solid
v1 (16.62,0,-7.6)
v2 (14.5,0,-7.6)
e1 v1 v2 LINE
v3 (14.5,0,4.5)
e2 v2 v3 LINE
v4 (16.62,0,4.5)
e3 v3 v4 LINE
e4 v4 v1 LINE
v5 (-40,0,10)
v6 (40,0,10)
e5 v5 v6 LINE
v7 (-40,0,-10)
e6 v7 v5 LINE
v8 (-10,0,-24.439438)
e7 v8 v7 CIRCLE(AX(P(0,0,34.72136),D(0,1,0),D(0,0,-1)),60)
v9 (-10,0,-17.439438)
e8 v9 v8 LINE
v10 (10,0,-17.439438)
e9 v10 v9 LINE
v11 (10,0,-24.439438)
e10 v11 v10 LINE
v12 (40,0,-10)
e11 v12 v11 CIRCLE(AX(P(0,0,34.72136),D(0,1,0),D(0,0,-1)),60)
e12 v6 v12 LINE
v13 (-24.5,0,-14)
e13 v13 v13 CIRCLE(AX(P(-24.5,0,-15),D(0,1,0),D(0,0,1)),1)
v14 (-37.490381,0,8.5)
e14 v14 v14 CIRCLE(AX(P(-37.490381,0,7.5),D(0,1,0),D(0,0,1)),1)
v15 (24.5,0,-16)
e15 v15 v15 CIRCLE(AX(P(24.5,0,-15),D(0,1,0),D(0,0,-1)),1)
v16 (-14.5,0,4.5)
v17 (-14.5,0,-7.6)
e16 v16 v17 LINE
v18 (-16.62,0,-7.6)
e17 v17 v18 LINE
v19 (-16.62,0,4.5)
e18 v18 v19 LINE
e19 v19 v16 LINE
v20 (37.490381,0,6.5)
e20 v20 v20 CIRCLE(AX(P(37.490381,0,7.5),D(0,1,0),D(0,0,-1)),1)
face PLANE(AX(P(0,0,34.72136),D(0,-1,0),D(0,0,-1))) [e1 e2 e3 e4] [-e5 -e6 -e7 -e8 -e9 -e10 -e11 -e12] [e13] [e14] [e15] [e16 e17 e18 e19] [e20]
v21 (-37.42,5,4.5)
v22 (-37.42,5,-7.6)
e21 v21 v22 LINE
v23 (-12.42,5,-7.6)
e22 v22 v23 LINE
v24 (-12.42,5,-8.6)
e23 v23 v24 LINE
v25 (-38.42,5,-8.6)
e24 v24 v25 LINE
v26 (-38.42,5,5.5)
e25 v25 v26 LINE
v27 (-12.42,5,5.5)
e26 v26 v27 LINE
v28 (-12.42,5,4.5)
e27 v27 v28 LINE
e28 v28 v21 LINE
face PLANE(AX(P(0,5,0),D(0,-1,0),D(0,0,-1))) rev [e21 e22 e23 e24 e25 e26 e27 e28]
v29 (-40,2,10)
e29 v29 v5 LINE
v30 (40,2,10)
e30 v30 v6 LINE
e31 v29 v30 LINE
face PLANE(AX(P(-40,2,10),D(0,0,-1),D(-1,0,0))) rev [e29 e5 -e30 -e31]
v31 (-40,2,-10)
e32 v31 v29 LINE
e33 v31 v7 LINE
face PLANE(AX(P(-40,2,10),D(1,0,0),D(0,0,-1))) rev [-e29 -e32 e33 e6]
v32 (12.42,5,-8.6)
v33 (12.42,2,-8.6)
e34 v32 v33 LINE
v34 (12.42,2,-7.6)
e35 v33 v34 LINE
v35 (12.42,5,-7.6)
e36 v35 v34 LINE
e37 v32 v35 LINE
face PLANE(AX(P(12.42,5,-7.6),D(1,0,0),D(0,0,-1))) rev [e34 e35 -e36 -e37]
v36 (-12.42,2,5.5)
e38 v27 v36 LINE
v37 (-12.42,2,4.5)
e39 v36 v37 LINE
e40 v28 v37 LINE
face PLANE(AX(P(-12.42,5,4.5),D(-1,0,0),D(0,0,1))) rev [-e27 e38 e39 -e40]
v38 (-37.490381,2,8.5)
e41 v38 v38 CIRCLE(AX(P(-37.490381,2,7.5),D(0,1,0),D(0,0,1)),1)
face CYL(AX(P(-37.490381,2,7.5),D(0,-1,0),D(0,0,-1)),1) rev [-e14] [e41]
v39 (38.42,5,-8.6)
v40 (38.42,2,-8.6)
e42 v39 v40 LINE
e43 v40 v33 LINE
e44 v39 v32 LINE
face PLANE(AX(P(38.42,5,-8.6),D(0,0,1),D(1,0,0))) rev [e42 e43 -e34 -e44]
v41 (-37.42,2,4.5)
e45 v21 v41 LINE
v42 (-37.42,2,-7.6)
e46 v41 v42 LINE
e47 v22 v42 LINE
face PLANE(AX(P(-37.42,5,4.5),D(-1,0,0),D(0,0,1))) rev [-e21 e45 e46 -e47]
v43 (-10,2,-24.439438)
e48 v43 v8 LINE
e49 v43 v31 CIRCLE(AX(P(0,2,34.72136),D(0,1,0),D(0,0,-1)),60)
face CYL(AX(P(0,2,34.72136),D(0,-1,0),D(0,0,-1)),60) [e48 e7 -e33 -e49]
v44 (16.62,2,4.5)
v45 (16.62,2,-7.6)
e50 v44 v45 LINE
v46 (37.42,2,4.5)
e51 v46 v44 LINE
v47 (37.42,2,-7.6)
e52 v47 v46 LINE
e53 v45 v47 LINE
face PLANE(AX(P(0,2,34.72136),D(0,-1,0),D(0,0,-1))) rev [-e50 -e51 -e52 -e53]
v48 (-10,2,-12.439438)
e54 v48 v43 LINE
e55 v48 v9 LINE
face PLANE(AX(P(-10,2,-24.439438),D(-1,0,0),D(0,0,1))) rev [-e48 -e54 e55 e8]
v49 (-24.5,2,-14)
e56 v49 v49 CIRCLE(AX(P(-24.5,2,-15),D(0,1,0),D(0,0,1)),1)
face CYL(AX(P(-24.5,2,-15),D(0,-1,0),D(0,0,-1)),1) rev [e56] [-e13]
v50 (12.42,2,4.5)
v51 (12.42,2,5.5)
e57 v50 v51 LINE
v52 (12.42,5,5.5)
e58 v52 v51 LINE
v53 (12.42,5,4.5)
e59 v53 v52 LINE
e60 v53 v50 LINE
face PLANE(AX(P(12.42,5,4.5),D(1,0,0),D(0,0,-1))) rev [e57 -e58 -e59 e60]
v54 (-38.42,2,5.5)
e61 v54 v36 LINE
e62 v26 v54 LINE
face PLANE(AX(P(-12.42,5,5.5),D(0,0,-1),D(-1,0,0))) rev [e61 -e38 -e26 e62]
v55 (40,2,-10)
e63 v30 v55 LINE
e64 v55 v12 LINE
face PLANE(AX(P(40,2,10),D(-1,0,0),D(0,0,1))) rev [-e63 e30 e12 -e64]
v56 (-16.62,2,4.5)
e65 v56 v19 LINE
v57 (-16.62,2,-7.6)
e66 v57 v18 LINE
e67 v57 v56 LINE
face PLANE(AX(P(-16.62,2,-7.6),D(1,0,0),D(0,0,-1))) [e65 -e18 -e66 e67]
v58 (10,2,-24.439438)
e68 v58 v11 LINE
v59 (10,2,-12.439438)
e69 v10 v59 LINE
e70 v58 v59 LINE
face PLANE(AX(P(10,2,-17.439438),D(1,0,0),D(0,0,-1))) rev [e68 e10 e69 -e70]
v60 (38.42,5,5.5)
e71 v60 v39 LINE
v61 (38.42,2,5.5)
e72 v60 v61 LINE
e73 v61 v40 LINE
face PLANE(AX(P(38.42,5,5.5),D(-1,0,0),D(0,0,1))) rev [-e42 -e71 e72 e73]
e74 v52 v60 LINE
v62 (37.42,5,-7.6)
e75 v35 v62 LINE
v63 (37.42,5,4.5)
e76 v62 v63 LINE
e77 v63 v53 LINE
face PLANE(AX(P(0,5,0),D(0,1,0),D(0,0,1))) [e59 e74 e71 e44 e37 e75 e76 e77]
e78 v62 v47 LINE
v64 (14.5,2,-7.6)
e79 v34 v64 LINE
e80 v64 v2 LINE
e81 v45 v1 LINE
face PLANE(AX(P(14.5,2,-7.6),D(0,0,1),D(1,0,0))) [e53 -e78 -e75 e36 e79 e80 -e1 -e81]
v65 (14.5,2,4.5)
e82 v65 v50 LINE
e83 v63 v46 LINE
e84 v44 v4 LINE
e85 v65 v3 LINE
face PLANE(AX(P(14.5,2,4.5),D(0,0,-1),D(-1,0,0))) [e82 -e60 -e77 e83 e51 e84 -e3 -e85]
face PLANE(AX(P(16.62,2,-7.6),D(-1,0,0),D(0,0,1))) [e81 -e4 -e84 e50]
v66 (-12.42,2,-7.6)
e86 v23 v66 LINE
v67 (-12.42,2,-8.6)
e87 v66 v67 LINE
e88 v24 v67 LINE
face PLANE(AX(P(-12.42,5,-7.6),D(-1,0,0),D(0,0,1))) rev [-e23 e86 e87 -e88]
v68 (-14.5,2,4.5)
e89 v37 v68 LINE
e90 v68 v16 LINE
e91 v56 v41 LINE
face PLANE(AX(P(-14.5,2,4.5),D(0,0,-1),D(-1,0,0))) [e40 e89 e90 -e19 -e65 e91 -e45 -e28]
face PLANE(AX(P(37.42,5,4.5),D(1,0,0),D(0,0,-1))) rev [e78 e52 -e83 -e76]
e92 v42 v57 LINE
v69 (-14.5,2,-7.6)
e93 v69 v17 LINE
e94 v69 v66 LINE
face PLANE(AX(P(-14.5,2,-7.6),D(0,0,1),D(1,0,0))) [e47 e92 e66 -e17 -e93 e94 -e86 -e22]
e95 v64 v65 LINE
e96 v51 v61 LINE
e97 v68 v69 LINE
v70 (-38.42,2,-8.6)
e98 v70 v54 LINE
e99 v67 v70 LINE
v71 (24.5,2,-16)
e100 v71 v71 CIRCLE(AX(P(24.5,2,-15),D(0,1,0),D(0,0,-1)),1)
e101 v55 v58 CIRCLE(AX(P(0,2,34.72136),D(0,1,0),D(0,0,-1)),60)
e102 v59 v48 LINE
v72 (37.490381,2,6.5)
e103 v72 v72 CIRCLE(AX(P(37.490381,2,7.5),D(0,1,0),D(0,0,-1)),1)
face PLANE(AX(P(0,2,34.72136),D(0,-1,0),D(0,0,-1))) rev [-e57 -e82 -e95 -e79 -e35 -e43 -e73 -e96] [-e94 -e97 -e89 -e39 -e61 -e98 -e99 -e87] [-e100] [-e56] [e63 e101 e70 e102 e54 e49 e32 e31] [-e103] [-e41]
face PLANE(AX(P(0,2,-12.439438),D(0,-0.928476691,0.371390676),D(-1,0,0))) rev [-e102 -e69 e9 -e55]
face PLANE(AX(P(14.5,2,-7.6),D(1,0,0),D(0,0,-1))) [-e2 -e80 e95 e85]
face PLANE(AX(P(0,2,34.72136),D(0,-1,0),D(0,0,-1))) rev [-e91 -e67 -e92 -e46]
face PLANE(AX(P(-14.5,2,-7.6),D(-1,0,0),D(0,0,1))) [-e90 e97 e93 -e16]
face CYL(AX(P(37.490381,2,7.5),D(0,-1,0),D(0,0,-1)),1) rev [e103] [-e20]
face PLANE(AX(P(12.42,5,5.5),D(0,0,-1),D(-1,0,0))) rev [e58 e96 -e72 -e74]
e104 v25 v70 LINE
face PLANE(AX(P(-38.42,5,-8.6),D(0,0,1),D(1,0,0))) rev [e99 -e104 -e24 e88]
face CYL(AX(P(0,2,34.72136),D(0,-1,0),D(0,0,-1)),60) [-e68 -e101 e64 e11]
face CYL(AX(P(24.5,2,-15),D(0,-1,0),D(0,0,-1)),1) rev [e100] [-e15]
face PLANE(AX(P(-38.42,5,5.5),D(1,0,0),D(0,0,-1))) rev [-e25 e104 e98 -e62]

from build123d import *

# Parameters (mm, degrees)
SKETCH2_R           = 1
SKETCH2_W           = 2.12
SKETCH2_H           = 12.1
BOSS_EXTRUDE2_DEPTH = 2
BOSS_EXTRUDE3_DEPTH = 3
CHAMFER1_SIZE2      = 2
CHAMFER1_SIZE       = 5


with BuildPart() as part:
    # Sketch2 → Boss-Extrude2 (new body)
    with BuildSketch(Plane(origin=(0, 0, 0), x_dir=(1, 0, 0), z_dir=(0, 1, 0))):
        with BuildLine():
            Line((-10, 24.439438281), (-10, 17.439438281))
            Line((-10, 17.439438281), (10, 17.439438281))
            Line((10, 17.439438281), (10, 24.439438281))
            ThreePointArc((10, 24.439438281), (26.021613026, 19.342266443), (40, 10))
            Line((40, 10), (40, -10))
            Line((40, -10), (-40, -10))
            Line((-40, -10), (-40, 10))
            ThreePointArc((-40, 10), (-26.021613026, 19.342266443), (-10, 24.439438281))
        make_face()
        with Locations(Location((-37.490381057, -7.5, 0), (0, 0, 270))):
            Circle(SKETCH2_R, mode=Mode.SUBTRACT)
        with Locations(Location((37.490381057, -7.5, 0), (0, 0, 90))):
            Circle(SKETCH2_R, mode=Mode.SUBTRACT)
        with Locations(Location((-24.5, 15, 0), (0, 0, 270))):
            Circle(SKETCH2_R, mode=Mode.SUBTRACT)
        with Locations(Location((24.5, 15, 0), (0, 0, 90))):
            Circle(SKETCH2_R, mode=Mode.SUBTRACT)
        with Locations((15.56, 1.55)):
            Rectangle(SKETCH2_W, SKETCH2_H, mode=Mode.SUBTRACT)
        with Locations((-15.56, 1.55)):
            Rectangle(SKETCH2_W, SKETCH2_H, mode=Mode.SUBTRACT)
    extrude(amount=BOSS_EXTRUDE2_DEPTH)

    # Sketch3 → Boss-Extrude3 (add)
    with BuildSketch(Plane(origin=(0, 2, 0), x_dir=(1, 0, 0), z_dir=(0, 1, 0))):
        Polygon((12.419999998, -4.5), (37.42, -4.5), (37.42, 7.6), (12.419999998, 7.6), (12.419999998, 8.599999996), (38.419999998, 8.599999996), (38.419999998, -5.499999996), (12.419999998, -5.499999996), align=None)
        Polygon((-12.419999998, -4.5), (-12.419999998, -5.499999996), (-38.419999998, -5.499999996), (-38.419999998, 8.599999996), (-12.419999998, 8.599999996), (-12.419999998, 7.6), (-37.42, 7.6), (-37.42, -4.5), align=None)
    extrude(amount=BOSS_EXTRUDE3_DEPTH)

    # Chamfer1
    chamfer1_edges = [part.edges().sort_by_distance(p)[0] for p in [
        (0, 2, -17.439438281),
    ]]
    chamfer1_side = [part.faces().sort_by_distance(p)[0] for p in [
        (0, 2, -17.399438281),
    ]]
    chamfer(chamfer1_edges, length=CHAMFER1_SIZE - 0.0001, length2=CHAMFER1_SIZE2 - 0.0001, reference=chamfer1_side[0])  # a hair under: the kernel refuses the full size


solid = part.part
